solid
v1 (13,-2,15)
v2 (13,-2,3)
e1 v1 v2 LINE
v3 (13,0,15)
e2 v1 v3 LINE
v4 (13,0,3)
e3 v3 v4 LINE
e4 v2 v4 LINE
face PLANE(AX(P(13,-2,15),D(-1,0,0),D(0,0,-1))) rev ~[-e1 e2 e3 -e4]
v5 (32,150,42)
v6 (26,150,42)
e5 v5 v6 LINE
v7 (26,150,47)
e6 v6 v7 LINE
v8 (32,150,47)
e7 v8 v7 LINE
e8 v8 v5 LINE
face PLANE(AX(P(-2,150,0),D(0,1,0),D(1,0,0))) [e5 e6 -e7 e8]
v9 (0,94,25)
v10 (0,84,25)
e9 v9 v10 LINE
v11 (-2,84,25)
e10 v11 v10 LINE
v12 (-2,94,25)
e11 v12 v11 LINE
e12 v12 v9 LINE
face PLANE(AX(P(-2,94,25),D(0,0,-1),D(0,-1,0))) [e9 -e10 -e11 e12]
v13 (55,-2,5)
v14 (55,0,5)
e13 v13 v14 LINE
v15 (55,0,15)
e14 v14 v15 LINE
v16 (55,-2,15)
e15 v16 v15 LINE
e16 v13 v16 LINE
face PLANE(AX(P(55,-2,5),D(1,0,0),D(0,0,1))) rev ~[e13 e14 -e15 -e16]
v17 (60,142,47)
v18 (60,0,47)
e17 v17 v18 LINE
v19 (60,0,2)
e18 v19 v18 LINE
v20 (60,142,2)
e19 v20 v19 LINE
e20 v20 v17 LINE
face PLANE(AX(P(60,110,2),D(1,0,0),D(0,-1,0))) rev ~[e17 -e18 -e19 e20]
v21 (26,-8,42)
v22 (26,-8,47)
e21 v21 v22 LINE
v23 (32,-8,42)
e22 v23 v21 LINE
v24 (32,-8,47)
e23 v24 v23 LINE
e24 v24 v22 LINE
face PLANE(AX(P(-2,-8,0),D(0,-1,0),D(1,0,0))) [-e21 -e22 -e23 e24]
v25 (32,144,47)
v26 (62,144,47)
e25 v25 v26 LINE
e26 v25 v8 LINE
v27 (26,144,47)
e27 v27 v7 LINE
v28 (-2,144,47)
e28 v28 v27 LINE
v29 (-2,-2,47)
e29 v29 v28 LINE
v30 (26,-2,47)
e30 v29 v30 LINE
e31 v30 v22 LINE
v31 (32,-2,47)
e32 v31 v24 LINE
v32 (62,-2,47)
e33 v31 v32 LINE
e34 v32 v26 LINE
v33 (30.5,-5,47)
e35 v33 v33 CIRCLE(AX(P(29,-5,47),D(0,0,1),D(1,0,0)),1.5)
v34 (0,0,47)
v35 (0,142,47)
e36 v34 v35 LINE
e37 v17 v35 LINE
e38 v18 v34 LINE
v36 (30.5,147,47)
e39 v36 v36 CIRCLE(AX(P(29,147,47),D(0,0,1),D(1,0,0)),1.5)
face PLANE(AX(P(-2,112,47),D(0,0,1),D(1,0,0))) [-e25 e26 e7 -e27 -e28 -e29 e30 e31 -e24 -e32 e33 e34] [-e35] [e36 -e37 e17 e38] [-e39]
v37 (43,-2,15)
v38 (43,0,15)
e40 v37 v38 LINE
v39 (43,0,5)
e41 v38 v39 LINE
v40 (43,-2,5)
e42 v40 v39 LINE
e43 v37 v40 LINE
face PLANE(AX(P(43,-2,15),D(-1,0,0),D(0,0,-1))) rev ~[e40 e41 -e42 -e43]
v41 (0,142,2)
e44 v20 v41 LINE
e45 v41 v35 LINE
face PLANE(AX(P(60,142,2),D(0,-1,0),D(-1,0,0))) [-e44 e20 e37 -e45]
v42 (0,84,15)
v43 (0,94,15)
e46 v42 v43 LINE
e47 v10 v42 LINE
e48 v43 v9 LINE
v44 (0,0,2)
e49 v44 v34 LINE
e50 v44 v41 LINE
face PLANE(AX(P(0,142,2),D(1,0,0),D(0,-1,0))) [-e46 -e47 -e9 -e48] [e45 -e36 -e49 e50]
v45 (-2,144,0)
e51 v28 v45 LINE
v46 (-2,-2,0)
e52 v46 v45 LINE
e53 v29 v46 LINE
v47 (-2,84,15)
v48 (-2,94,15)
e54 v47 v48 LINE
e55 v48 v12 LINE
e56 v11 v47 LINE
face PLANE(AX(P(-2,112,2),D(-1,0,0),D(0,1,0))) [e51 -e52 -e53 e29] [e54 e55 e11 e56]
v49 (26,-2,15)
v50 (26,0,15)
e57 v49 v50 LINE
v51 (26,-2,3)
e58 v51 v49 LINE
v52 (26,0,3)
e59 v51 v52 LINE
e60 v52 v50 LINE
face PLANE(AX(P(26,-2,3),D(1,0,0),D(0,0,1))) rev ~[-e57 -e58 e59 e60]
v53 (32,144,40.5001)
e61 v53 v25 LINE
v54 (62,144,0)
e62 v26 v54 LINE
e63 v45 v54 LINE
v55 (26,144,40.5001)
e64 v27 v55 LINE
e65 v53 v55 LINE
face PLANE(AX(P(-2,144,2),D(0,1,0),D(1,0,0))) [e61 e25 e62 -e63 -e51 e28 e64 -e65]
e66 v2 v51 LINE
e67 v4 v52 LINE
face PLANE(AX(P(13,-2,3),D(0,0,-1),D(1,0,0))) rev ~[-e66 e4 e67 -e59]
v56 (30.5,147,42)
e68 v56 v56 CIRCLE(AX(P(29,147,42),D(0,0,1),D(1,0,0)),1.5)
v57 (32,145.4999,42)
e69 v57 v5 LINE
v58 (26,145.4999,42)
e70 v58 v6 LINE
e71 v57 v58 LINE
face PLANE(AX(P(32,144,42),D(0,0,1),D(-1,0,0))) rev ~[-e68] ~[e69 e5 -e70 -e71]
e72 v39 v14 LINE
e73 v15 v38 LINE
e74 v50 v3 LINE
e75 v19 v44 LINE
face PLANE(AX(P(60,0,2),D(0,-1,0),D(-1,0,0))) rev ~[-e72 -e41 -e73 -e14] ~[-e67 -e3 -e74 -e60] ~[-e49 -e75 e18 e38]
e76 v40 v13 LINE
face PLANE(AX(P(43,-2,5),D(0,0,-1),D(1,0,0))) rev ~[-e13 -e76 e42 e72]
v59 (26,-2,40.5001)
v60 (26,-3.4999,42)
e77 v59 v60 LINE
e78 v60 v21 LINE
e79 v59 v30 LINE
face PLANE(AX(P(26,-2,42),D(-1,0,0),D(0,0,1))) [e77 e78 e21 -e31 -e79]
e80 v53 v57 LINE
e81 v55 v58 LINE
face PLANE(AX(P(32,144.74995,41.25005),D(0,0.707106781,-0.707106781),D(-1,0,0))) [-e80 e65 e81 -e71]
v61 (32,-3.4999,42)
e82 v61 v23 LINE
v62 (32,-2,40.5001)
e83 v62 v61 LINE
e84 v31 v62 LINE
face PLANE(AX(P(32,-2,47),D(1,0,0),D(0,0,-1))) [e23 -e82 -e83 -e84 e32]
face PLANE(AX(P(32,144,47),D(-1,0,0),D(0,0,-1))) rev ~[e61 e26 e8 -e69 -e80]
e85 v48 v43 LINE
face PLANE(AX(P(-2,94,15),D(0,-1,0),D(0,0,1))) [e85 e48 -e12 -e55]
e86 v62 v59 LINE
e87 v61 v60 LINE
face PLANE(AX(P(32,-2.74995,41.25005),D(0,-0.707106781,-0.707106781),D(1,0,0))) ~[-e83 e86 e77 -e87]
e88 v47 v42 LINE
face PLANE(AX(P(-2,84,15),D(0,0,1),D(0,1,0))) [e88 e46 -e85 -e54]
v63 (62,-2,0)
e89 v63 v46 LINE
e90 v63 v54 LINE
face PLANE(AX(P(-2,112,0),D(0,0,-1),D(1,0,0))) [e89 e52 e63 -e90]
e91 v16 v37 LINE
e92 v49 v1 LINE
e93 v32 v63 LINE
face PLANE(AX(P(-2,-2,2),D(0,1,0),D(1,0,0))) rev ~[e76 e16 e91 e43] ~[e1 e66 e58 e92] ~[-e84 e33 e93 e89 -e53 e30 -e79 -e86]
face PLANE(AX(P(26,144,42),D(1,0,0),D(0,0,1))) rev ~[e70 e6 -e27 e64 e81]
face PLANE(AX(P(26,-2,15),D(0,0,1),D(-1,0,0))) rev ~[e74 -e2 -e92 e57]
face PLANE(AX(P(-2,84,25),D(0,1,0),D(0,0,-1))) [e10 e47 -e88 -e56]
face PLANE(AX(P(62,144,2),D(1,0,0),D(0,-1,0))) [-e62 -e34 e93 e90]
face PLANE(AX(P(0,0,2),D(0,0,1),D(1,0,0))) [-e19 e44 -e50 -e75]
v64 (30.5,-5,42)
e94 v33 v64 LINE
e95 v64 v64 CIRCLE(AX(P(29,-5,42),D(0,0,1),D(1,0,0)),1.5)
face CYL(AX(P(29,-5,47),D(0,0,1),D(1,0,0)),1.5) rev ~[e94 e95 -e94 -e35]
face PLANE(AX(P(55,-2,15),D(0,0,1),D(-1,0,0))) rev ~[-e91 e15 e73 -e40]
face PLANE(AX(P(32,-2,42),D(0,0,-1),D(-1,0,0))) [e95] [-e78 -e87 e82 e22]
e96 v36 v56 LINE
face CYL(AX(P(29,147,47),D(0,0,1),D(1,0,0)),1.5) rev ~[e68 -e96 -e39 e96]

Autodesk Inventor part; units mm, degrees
ref_plane "YZ Plane" through (0, 0, 0) normal (1, 0, 0) x (0, 1, 0)
ref_plane "XZ Plane" through (0, 0, 0) normal (0, 1, 0) x (-1, 0, 0)
ref_plane "XY Plane" through (0, 0, 0) normal (0, 0, 1) x (1, 0, 0)
sketch "Esboço1" plane through (0, 0, 0) normal (0, 0, 1) x (1, 0, 0)
  line L0 (0, 0) -> (60, 0)
  line L1 (60, 0) -> (60, 110)
  line L2 (60, 110) -> (0, 110)
  line L3 (0, 110) -> (0, 0)
  line L4 (62, 112) -> (62, -2)
  line L5 (62, -2) -> (-2, -2)
  line L6 (-2, -2) -> (-2, 112)
  line L7 (-2, 112) -> (62, 112)
  dimension "d0" = 60
  dimension "d1" = 110
  dimension "d2" = 2
extrude "Extrusão1" add sketch "Esboço1" along normal blind 2 contours L3 L2 L1 L0 | L4 L5 L6 L7
sketch "Esboço2" plane through (0, 0, 2) normal (0, 0, 1) x (1, 0, 0)
  line L0 (62, 112) -> (-2, 112) projected
  line L1 (-2, 112) -> (-2, -2) projected
  line L2 (62, -2) -> (62, 112) projected
  line L3 (-2, -2) -> (62, -2) projected
  line L4 (0, 0) -> (0, 110)
  line L5 (0, 110) -> (60, 110)
  line L6 (60, 110) -> (60, 0)
  line L7 (60, 0) -> (0, 0)
  point P0 (0, 0)
  dimension "d5" = 2
extrude "Extrusão2" add sketch "Esboço2" along normal blind 45
sketch "Esboço3" plane through (-2, -2, 0) normal (0, -1, 0) x (1, 0, 0)
  line L0 (45, 5) -> (57, 5)
  line L1 (57, 5) -> (57, 15)
  line L2 (57, 15) -> (45, 15)
  line L3 (45, 15) -> (45, 5)
  line L4 (0, 0) -> (64, 0) projected
  line L5 (64, 0) -> (64, 47) projected
  point P0 (2, 0)
  dimension "d8" = 10
  dimension "d9" = 12
  dimension "d10" = 5
  dimension "d11" = 7
extrude "Extrusão3" cut sketch "Esboço3" against normal blind 38
sketch "Esboço11" plane through (-2, 112, 0) normal (0, 1, 0) x (1, 0, 0)
  line L0 (64, 0) -> (64, -47) projected
  line L1 (0, 0) -> (64, 0)
  line L2 (64, 0) -> (64, -2)
  line L3 (64, -2) -> (0, -2)
  line L4 (0, -2) -> (0, 0)
  line L5 (64, 0) -> (0, 0) projected
  point P0 (2, 0)
  dimension "d45" = 2
  dimension "d46" = 0
  dimension "d47" = 64
extrude "Extrusão8" add sketch "Esboço11" along normal blind 32
sketch "Esboço18" plane through (-2, 112, 2) normal (0, 0, 1) x (1, 0, 0)
  line L0 (0, 0) -> (64, 0) projected
  line L1 (64, 32) -> (64, 0) projected
  line L2 (0, 32) -> (64, 32) projected
  line L3 (0, 0) -> (0, 32) projected
  line L4 (0, -114) -> (0, 0) projected
  line L5 (64, -114) -> (0, -114) projected
  line L6 (64, 0) -> (64, -114) projected
  line L7 (2, -112) -> (62, -112) projected
  line L8 (62, -112) -> (62, -2) projected
  line L9 (62, -2) -> (2, -2) projected
  line L10 (2, -2) -> (2, -112) projected
  line L11 (62, 0) -> (62, 30)
  line L12 (62, 30) -> (2, 30)
  line L13 (2, 30) -> (2, 0)
  dimension "d89" = 2
extrude "Extrusão15" add sketch "Esboço18" along normal blind 45 contours L3 L2 L1 L0 L11 L12 L13
sketch "Esboço20" plane through (-2, -2, 0) normal (-1, 0, 0) x (0, 0, 1)
  line L0 (25, 86) -> (15, 86)
  line L1 (15, 86) -> (15, 96)
  line L2 (15, 96) -> (25, 96)
  line L3 (25, 96) -> (25, 86)
  line L4 (0, 146) -> (47, 146) projected
  line L5 (0, 146) -> (0, 0) projected
  point P0 (0, 2)
  dimension "d101" = 10
  dimension "d102" = 10
  dimension "d103" = 50
  dimension "d104" = 15
extrude "Extrusão17" cut sketch "Esboço20" against normal blind 2
sketch "Esboço21" plane through (-2, -2, 0) normal (0, -1, 0) x (1, 0, 0)
  line L0 (62, 47) -> (2, 47) projected
  line L1 (28, 47) -> (34, 47)
  line L2 (34, 47) -> (34, 42)
  line L3 (34, 42) -> (28, 42)
  line L4 (28, 42) -> (28, 47)
  line L5 (64, 0) -> (64, 47) projected
  point P0 (2, 0)
  dimension "d108" = 6
  dimension "d109" = 5
  dimension "d110" = 30
extrude "Extrusão18" add sketch "Esboço21" along normal blind 6
sketch "Esboço22" plane through (0, 0, 47) normal (0, 0, 1) x (1, 0, 0)
  circle A0 centre (29, -5) radius 1.5
  line L0 (32, -2) -> (32, -8) projected
  line L1 (32, -8) -> (26, -8) projected
  point P0 (0, 0)
  dimension "d113" = 3
  dimension "d114" = 3
  dimension "d115" = 3
extrude "Extrusão19" cut sketch "Esboço22" against normal blind 6
sketch "Esboço23" plane through (-2, 144, 0) normal (0, 1, 0) x (1, 0, 0)
  line L0 (64, 0) -> (64, -47) projected
  line L1 (64, -47) -> (0, -47) projected
  line L2 (0, -47) -> (0, 0) projected
  line L3 (0, 0) -> (64, 0) projected
  line L4 (34, -42) -> (28, -42) projected
  line L5 (28, -42) -> (28, -47) projected
  line L6 (34, -47) -> (34, -42) projected
  point P0 (2, 0)
extrude "Extrusão20" add sketch "Esboço23" along normal blind 6 contours L1 L5 L4 L6
sketch "Esboço24" plane through (0, 0, 47) normal (0, 0, 1) x (1, 0, 0)
  circle A0 centre (29, 147) radius 1.5
  line L0 (26, 150) -> (32, 150) projected
  line L1 (32, 144) -> (32, 150) projected
  point P0 (0, 0)
  dimension "d120" = 3
  dimension "d121" = 3
  dimension "d122" = 3
extrude "Extrusão21" cut sketch "Esboço24" against normal blind 6
chamfer "Chanfro2" distance 1.5 angle 45 2 edges at (29, 144, 42) (29, -2, 42)
sketch "Esboço25" plane through (0, 0, 47) normal (0, 0, 1) x (1, 0, 0)
  line L0 (0, 0) -> (0, 110) projected
  line L1 (0, 110) -> (60, 110)
  line L2 (60, 110) -> (60, 112)
  line L3 (60, 112) -> (0, 112)
  line L4 (0, 112) -> (0, 110)
extrude "Extrusão22" cut sketch "Esboço25" against normal blind 45
sketch "Esboço26" plane through (-2, -2, 0) normal (0, -1, 0) x (1, 0, 0)
  line L0 (15, 3) -> (28, 3)
  line L1 (28, 3) -> (28, 15)
  line L2 (28, 15) -> (15, 15)
  line L3 (15, 15) -> (15, 3)
  line L4 (0, 0) -> (0, 47) projected
  line L5 (0, 0) -> (64, 0) projected
  point P0 (2, 0)
  dimension "d130" = 13
  dimension "d131" = 12
  dimension "d132" = 15
  dimension "d133" = 3
extrude "Extrusão23" cut sketch "Esboço26" against normal blind 10
properties part number "basecaixa"
